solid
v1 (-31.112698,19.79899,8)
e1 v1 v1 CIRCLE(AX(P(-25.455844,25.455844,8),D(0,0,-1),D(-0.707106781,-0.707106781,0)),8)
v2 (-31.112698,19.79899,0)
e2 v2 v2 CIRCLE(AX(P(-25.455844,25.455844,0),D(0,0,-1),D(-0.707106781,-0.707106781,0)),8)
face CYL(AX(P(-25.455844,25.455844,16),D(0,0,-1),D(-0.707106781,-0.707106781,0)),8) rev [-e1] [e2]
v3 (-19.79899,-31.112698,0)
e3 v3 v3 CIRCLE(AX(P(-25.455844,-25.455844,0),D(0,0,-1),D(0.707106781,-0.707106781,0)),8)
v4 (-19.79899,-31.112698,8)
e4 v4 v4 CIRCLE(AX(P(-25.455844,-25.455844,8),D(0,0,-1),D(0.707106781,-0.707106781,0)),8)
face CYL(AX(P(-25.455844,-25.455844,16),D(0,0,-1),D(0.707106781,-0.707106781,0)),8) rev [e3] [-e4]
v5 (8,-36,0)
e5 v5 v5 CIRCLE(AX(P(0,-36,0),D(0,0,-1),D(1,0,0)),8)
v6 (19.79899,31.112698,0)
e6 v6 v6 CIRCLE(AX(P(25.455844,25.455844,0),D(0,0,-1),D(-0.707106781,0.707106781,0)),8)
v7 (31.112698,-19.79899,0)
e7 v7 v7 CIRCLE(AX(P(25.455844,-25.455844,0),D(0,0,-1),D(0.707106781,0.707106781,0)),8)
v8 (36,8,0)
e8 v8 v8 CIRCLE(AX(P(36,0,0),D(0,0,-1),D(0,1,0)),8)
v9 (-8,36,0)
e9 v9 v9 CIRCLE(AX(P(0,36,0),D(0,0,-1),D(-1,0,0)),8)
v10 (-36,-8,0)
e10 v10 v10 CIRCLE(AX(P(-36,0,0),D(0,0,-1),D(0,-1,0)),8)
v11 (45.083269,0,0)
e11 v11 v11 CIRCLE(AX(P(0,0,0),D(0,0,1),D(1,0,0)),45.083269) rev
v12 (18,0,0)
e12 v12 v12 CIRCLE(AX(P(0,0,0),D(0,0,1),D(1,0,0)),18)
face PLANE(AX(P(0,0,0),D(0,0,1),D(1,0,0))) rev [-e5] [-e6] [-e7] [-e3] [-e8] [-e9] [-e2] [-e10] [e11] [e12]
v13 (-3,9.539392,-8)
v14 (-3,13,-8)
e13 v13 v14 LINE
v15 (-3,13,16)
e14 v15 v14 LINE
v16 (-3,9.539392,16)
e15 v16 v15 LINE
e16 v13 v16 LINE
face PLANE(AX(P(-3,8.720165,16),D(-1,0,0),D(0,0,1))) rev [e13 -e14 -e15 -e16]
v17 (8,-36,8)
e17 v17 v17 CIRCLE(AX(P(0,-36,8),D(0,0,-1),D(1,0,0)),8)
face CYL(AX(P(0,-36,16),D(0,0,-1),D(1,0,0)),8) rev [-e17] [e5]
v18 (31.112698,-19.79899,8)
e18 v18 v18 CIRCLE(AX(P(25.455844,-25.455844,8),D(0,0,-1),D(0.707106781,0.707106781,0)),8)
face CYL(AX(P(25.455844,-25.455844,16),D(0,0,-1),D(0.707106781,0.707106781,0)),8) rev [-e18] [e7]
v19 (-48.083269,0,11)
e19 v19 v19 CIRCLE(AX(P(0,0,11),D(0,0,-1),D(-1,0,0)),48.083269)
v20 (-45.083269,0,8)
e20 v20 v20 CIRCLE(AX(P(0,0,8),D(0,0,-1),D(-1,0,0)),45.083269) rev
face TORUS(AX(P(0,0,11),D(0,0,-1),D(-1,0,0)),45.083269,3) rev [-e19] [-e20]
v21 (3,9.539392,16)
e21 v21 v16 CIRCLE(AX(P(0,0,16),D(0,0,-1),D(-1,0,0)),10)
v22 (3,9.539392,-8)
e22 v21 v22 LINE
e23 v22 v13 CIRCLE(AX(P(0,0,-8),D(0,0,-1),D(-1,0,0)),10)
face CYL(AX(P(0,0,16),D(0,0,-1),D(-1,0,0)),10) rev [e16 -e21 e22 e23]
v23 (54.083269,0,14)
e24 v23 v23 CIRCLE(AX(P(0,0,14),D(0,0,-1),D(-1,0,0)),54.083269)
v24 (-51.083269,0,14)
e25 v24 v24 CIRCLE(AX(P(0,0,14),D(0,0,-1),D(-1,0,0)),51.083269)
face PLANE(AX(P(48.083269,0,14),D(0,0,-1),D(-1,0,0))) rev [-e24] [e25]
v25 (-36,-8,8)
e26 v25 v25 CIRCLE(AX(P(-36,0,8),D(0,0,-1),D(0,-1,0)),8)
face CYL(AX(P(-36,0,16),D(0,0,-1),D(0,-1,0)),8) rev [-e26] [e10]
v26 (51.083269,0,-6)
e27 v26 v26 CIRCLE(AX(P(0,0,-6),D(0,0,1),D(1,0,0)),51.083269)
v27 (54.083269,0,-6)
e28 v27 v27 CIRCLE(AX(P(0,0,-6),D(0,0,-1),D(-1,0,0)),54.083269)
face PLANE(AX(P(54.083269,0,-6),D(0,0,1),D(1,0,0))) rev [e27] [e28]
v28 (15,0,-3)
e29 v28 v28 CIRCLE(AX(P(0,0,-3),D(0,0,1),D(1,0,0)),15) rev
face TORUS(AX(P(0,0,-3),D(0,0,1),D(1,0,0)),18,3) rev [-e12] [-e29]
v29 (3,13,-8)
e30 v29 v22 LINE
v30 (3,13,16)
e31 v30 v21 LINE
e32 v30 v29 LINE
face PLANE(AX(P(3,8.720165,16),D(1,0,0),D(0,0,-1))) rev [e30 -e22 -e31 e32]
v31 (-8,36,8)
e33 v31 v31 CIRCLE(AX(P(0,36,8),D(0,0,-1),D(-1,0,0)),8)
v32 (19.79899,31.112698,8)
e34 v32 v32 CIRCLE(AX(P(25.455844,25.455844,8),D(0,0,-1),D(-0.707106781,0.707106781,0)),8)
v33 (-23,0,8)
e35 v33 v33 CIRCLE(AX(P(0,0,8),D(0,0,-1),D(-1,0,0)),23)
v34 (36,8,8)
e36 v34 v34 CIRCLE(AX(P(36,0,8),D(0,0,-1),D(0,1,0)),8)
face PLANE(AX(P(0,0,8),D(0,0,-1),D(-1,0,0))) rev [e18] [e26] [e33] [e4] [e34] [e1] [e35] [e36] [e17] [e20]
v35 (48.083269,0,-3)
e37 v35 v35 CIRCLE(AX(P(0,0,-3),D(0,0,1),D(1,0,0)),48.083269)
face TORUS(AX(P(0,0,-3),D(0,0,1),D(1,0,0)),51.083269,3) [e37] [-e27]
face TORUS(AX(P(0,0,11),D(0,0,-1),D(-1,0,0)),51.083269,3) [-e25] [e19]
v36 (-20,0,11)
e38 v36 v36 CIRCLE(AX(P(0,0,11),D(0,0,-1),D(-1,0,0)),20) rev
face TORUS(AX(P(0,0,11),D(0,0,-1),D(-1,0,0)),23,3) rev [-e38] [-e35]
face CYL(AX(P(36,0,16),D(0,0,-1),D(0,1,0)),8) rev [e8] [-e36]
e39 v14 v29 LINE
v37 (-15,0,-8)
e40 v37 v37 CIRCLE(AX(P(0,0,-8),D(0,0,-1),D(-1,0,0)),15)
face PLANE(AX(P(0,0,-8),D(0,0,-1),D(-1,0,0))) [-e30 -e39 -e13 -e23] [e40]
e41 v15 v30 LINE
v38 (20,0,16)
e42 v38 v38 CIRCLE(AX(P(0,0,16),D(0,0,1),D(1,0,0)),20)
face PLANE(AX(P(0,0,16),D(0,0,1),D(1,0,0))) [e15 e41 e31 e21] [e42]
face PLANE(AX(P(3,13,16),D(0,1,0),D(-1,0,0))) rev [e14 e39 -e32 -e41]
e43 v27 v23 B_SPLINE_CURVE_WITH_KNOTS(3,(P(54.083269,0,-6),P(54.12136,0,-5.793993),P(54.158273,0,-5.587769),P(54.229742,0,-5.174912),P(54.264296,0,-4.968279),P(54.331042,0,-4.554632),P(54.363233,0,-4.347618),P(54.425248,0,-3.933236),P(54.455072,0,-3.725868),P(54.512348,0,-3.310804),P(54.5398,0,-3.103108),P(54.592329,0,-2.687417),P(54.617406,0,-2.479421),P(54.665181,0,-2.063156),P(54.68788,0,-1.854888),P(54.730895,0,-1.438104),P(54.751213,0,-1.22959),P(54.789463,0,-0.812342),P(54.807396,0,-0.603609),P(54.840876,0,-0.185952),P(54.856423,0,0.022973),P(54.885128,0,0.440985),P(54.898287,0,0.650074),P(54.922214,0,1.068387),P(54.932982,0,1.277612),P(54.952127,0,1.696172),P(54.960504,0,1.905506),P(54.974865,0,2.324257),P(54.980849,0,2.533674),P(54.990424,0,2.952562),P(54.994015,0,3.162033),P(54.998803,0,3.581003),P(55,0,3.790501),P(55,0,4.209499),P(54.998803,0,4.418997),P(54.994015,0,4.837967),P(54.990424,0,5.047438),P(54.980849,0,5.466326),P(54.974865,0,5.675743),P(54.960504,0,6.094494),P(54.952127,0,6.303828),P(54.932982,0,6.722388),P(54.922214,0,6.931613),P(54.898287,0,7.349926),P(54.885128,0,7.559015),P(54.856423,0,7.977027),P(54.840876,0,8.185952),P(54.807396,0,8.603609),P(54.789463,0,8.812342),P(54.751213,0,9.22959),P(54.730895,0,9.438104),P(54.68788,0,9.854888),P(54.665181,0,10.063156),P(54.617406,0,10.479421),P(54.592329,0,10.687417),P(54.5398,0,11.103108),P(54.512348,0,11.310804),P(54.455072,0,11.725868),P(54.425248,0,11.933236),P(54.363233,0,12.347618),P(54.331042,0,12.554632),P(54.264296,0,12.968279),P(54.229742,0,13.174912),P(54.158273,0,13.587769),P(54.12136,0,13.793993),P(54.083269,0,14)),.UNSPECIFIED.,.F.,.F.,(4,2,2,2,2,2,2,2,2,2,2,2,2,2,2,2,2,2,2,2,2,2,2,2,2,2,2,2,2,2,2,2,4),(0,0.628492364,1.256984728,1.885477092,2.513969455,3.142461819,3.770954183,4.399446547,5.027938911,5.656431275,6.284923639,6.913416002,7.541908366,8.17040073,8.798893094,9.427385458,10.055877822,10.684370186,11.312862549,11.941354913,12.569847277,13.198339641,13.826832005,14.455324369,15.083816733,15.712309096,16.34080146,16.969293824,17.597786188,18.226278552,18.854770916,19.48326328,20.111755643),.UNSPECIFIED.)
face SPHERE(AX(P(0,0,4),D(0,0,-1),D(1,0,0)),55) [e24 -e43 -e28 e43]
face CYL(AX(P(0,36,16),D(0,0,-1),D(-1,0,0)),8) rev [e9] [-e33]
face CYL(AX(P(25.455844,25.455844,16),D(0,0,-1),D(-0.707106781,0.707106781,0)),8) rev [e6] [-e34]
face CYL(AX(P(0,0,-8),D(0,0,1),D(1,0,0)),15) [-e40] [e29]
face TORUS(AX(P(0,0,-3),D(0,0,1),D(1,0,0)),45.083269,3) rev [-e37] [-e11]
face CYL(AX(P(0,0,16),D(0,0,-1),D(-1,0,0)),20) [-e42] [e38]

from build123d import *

# Parameters (mm, degrees)
SKETCH1_R          = 20
EXTRUDE1_DEPTH     = 16
SKETCH2_R          = 15
EXTRUDE2_DEPTH     = 8
SKETCH3_R          = 10
CUT_EXTRUDE1_DEPTH = 38.094473982
SKETCH4_W          = 6
SKETCH4_H          = 4.279835391
CUT_EXTRUDE2_DEPTH = 38.094473982
FILLET1_R          = 3
FILLET3_R          = 3
FILLET4_R          = 3
SKETCH6_R          = 8
CUT_EXTRUDE3_DEPTH = 80.410326784
CIRPATTERN1_COUNT  = 8
CUT_EXTRUDE4_DEPTH = 80.410326784
FILLET5_R          = 3


with BuildPart() as part:
    # Sketch1 → Extrude1 (new body)
    with BuildSketch(Plane.XY):
        Circle(SKETCH1_R)
    extrude(amount=EXTRUDE1_DEPTH)

    # Sketch2 → Extrude2 (add)
    with BuildSketch(Plane(origin=(0, 0, 0), x_dir=(-1, 0, 0), z_dir=(0, 0, -1))):
        with Locations(Location((0, 0, 0), (0, 0, 180))):
            Circle(SKETCH2_R)
    extrude(amount=EXTRUDE2_DEPTH)

    # Sketch3 → Cut-Extrude1 (cut, through all)
    with BuildSketch(Plane(origin=(0, 0, -8), x_dir=(-1, 0, 0), z_dir=(0, 0, -1))):
        Circle(SKETCH3_R)
    extrude(amount=-CUT_EXTRUDE1_DEPTH, mode=Mode.SUBTRACT)

    # Sketch4 → Cut-Extrude2 (cut, through all)
    with BuildSketch(Plane(origin=(0, 0, -8), x_dir=(-1, 0, 0), z_dir=(0, 0, -1))):
        with Locations((0, 10.860082305)):
            Rectangle(SKETCH4_W, SKETCH4_H)
    extrude(amount=-CUT_EXTRUDE2_DEPTH, mode=Mode.SUBTRACT)

    # Fillet1
    fillet1_edges = [part.edges().sort_by_distance(p)[0] for p in [
        (-15, 0, 0),
    ]]
    fillet(fillet1_edges, radius=FILLET1_R)

    # Sketch5 → Revolve1 (revolve)
    with BuildSketch(Plane(origin=(0, 0, 0), x_dir=(1, 0, 0), z_dir=(0, 1, 0)), mode=Mode.PRIVATE) as revolve1_sk:
        with BuildLine():
            Line((0, -8), (48.083269132, -8))
            Line((48.083269132, -8), (48.083269132, -14))
            Line((48.083269132, -14), (54.083269132, -14))
            ThreePointArc((54.083269132, -14), (55, -4), (54.083269132, 6))
            Line((54.083269132, 6), (48.083269132, 6))
            Line((48.083269132, 6), (48.083269132, 0))
            Line((48.083269132, 0), (0, 0))
            Line((0, 0), (0, -8))
        make_face()
    revolve(revolve1_sk.sketch.rotate(Axis((0, 0, 0), (0, 0, 1)), 180), axis=Axis((0, 0, 0), (0, 0, 1)))

    # Fillet3
    fillet3_edges = [part.edges().sort_by_distance(p)[0] for p in [
        (48.083269132, 0, 0),
        (48.083269132, 0, -6),
    ]]
    fillet(fillet3_edges, radius=FILLET3_R - 0.0001)  # a hair under: the kernel refuses the full size

    # Fillet4
    fillet4_edges = [part.edges().sort_by_distance(p)[0] for p in [
        (48.083269132, 0, 14),
        (48.083269132, 0, 8),
    ]]
    fillet(fillet4_edges, radius=FILLET4_R - 0.0001)  # a hair under: the kernel refuses the full size

    # Sketch6 → Cut-Extrude3 (cut, through all)
    with BuildSketch(Plane(origin=(0, 0, 0), x_dir=(-1, 0, 0), z_dir=(0, 0, -1))):
        with Locations((0, 36)):
            Circle(SKETCH6_R)
    cut_extrude3 = extrude(amount=-CUT_EXTRUDE3_DEPTH, mode=Mode.SUBTRACT)

    # CirPattern1: Cut-Extrude3 ×8 about axis
    cirpattern1_axis = Axis((0, 0, 0), (0, 0, 1))
    for i in range(1, CIRPATTERN1_COUNT):
        add(cut_extrude3.rotate(cirpattern1_axis, i * 360 / CIRPATTERN1_COUNT), mode=Mode.SUBTRACT)

    # Sketch7 → Cut-Extrude4 (cut, through all)
    with BuildSketch(Plane(origin=(0, 0, 0), x_dir=(-1, 0, 0), z_dir=(0, 0, -1))):
        with BuildLine():
            Line((3, 9.539392014), (3, 13))
            Line((3, 13), (-3, 13))
            Line((-3, 13), (-3, 9.539392014))
            ThreePointArc((-3, 9.539392014), (0, -10), (3, 9.539392014))
        make_face()
    extrude(amount=-CUT_EXTRUDE4_DEPTH, mode=Mode.SUBTRACT)

    # Fillet5
    fillet5_edges = [part.edges().sort_by_distance(p)[0] for p in [
        (-20, 0, 8),
    ]]
    fillet(fillet5_edges, radius=FILLET5_R)


solid = part.part
